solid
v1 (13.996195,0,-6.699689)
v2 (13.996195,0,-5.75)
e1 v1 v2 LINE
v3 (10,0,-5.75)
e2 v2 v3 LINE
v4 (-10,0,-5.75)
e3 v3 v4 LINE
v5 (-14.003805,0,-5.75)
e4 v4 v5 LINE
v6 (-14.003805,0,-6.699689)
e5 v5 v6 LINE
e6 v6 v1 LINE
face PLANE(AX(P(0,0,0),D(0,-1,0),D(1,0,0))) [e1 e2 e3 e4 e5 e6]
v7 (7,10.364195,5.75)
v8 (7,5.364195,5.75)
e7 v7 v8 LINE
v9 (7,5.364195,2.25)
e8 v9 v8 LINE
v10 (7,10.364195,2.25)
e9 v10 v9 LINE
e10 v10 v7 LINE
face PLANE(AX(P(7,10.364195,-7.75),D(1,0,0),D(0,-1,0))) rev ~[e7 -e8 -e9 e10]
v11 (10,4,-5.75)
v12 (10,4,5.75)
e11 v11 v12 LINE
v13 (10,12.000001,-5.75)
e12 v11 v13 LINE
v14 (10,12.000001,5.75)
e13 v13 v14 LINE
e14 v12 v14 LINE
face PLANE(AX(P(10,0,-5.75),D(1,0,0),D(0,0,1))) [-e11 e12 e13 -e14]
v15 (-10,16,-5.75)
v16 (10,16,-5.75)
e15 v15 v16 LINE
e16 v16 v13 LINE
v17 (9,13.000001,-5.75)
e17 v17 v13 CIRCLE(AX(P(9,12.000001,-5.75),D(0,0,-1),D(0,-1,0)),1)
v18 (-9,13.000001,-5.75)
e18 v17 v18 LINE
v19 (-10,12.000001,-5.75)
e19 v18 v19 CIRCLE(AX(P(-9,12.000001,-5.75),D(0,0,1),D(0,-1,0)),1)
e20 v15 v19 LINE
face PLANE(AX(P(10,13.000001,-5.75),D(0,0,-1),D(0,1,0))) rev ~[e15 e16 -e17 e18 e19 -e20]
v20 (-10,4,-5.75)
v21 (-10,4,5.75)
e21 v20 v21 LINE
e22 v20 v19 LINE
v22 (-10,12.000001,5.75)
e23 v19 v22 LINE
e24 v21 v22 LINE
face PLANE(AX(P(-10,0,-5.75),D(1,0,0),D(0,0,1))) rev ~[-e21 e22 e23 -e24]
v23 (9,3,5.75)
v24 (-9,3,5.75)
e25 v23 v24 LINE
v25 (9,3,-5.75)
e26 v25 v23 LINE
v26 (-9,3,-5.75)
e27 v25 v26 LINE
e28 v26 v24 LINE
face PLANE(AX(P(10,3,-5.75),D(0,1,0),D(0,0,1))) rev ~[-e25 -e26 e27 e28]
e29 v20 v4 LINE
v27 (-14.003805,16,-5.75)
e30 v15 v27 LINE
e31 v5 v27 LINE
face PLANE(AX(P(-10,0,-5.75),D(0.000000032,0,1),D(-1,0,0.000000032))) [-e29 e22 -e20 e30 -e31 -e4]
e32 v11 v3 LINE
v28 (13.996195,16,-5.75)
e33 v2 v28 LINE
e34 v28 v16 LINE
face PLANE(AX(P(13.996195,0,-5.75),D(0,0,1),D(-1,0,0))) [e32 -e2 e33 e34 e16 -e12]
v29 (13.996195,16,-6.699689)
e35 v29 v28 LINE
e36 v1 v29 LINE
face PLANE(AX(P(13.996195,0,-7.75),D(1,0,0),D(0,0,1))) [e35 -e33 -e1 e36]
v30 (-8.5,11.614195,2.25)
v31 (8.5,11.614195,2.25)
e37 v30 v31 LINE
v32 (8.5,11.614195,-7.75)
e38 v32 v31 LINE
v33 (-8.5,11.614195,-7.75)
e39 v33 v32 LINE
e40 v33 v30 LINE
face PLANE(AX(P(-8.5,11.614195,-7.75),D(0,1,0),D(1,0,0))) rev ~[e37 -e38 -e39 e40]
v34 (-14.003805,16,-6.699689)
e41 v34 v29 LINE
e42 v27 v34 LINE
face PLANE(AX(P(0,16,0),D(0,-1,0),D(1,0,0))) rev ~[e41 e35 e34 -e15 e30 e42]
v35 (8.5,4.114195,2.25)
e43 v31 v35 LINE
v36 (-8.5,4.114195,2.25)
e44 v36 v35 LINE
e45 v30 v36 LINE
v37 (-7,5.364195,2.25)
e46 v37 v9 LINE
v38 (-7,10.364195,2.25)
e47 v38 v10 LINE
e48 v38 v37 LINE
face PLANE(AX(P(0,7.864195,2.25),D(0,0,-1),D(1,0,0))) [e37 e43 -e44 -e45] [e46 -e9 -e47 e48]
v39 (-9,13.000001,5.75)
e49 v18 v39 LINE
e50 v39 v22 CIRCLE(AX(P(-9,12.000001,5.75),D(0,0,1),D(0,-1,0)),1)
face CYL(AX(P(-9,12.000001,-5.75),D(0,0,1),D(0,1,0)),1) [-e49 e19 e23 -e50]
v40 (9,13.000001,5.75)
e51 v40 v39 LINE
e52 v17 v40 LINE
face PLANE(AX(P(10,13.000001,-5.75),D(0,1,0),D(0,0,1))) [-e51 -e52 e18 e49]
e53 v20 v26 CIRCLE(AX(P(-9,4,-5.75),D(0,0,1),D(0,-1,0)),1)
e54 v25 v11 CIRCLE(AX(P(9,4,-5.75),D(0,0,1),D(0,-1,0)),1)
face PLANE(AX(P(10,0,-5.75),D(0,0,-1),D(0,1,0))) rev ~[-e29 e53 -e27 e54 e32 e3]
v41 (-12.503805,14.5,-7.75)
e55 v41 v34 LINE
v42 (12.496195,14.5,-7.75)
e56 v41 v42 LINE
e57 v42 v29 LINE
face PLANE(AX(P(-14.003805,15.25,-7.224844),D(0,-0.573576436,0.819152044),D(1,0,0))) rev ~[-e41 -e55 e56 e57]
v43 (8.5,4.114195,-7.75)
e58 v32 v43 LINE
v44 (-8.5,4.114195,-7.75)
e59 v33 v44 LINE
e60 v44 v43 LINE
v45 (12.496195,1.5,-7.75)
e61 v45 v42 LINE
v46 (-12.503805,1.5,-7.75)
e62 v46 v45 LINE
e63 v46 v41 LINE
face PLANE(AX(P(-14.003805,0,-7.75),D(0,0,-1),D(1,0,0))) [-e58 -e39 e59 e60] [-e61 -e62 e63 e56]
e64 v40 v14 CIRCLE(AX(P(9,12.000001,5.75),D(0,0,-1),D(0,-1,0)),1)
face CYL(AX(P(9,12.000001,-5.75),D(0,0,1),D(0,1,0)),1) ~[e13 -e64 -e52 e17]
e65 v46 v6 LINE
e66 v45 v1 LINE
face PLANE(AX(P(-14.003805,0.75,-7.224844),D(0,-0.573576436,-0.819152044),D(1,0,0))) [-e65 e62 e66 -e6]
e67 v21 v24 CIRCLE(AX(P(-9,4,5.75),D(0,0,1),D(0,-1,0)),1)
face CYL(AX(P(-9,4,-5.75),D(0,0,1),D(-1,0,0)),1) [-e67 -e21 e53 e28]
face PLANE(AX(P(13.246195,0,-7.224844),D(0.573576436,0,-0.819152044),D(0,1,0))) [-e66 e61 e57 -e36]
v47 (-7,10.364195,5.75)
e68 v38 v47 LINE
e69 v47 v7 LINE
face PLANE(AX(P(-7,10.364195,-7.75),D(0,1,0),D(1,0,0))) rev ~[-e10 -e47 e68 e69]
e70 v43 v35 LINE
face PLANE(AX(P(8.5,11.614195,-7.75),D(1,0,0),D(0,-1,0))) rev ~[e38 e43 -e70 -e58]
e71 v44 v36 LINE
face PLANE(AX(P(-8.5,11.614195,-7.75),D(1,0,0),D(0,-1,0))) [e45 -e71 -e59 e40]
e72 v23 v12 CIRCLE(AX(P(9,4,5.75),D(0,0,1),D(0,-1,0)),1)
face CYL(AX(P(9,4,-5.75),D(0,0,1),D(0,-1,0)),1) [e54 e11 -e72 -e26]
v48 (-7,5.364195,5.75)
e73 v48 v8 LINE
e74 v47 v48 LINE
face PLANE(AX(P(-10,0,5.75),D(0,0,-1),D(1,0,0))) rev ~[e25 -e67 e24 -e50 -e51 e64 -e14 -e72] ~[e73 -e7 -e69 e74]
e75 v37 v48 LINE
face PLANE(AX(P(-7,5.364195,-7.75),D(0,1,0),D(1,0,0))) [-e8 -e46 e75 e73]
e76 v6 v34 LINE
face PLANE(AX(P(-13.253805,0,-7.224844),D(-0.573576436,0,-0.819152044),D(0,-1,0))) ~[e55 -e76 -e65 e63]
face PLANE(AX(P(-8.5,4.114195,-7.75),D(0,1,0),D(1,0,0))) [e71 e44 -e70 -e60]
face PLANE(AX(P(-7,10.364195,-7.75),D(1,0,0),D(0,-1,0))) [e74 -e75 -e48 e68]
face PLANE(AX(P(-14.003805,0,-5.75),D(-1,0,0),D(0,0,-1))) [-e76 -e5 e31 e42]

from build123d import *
from build123d import SkipClean  # not in build123d's __all__

# Parameters (mm, degrees)
F0_W     = 20
F0_H     = 11.5
F1_DEPTH = 16
F2_W     = 3
F2_H     = 11.5
F3_DEPTH = 25
F4_W     = 17
F4_H     = 7.5
F4_W_2   = 14
F4_H_2   = 5
F5_DEPTH = 10
F6_DEPTH = 25
F7_SIZE2 = 1.0503113073
F7_SIZE  = 1.5
F8_R     = 1


# Not quite as in the source:
# - ends of sketch curves that miss each other by under 0.0002 mm in the source are joined


with BuildPart() as f1:
    # F0 (on Front) → F1 (new body)
    with BuildSketch(Plane.XZ):
        Rectangle(F0_W, F0_H)
        Polygon((13.9961953573, -5.7499998733), (10, -5.7499998733), (-10, -5.75), (-14.0038046427, -5.7499998733), (-14.0038046427, -7.7499998733), (13.9961953573, -7.7499998733), align=None)
    extrude(amount=-F1_DEPTH)

    # F2 (on face) → F3 (cut)
    with BuildSketch(Plane.YZ.offset(10)):
        with Locations((1.5, 0)):
            Rectangle(F2_W, F2_H)
        with Locations((14.50000076, 0)):
            Rectangle(F2_W, F2_H)
    with SkipClean():  # cleaning this boolean's faces spoils the solid; the shape is the same uncleaned
        extrude(amount=-F3_DEPTH, mode=Mode.SUBTRACT)

    # F4 (on face) → F5 (cut)
    with BuildSketch(Plane(origin=(0, 0, -7.7499998733), x_dir=(1, 0, 0), z_dir=(0, 0, -1))):
        with Locations((0, -7.8641947285)):
            Rectangle(F4_W, F4_H)
        with Locations((0, -7.8641947285)):
            Rectangle(F4_W_2, F4_H_2, mode=Mode.SUBTRACT)
    with SkipClean():  # cleaning this boolean's faces spoils the solid; the shape is the same uncleaned
        extrude(amount=-F5_DEPTH, mode=Mode.SUBTRACT)

    # F4 (on face) → F6 (cut)
    with BuildSketch(Plane(origin=(0, 0, -7.7499998733), x_dir=(1, 0, 0), z_dir=(0, 0, -1))):
        with Locations((0, -7.8641947285)):
            Rectangle(F4_W_2, F4_H_2)
    with SkipClean():  # cleaning this boolean's faces spoils the solid; the shape is the same uncleaned
        extrude(amount=-F6_DEPTH, mode=Mode.SUBTRACT)

    # F7
    f7_edges = [f1.edges().sort_by_distance(p)[0] for p in [
        (-0.003805, 16, -7.75),
        (13.996195, 8, -7.75),
        (-0.003805, 0, -7.75),
        (-14.003805, 8, -7.75),
    ]]
    f7_side = f1.faces().sort_by_distance((-13.681314, 8, -7.75))[0]
    chamfer(f7_edges, length=F7_SIZE, length2=F7_SIZE2, reference=f7_side)

    # F8
    f8_edges = [f1.edges().sort_by_distance(p)[0] for p in [
        (10, 3, 0),
        (10, 13.000001, 0),
        (-10, 3, 0),
        (-10, 13.000001, 0),
    ]]
    fillet(f8_edges, radius=F8_R)


solid = f1.part
